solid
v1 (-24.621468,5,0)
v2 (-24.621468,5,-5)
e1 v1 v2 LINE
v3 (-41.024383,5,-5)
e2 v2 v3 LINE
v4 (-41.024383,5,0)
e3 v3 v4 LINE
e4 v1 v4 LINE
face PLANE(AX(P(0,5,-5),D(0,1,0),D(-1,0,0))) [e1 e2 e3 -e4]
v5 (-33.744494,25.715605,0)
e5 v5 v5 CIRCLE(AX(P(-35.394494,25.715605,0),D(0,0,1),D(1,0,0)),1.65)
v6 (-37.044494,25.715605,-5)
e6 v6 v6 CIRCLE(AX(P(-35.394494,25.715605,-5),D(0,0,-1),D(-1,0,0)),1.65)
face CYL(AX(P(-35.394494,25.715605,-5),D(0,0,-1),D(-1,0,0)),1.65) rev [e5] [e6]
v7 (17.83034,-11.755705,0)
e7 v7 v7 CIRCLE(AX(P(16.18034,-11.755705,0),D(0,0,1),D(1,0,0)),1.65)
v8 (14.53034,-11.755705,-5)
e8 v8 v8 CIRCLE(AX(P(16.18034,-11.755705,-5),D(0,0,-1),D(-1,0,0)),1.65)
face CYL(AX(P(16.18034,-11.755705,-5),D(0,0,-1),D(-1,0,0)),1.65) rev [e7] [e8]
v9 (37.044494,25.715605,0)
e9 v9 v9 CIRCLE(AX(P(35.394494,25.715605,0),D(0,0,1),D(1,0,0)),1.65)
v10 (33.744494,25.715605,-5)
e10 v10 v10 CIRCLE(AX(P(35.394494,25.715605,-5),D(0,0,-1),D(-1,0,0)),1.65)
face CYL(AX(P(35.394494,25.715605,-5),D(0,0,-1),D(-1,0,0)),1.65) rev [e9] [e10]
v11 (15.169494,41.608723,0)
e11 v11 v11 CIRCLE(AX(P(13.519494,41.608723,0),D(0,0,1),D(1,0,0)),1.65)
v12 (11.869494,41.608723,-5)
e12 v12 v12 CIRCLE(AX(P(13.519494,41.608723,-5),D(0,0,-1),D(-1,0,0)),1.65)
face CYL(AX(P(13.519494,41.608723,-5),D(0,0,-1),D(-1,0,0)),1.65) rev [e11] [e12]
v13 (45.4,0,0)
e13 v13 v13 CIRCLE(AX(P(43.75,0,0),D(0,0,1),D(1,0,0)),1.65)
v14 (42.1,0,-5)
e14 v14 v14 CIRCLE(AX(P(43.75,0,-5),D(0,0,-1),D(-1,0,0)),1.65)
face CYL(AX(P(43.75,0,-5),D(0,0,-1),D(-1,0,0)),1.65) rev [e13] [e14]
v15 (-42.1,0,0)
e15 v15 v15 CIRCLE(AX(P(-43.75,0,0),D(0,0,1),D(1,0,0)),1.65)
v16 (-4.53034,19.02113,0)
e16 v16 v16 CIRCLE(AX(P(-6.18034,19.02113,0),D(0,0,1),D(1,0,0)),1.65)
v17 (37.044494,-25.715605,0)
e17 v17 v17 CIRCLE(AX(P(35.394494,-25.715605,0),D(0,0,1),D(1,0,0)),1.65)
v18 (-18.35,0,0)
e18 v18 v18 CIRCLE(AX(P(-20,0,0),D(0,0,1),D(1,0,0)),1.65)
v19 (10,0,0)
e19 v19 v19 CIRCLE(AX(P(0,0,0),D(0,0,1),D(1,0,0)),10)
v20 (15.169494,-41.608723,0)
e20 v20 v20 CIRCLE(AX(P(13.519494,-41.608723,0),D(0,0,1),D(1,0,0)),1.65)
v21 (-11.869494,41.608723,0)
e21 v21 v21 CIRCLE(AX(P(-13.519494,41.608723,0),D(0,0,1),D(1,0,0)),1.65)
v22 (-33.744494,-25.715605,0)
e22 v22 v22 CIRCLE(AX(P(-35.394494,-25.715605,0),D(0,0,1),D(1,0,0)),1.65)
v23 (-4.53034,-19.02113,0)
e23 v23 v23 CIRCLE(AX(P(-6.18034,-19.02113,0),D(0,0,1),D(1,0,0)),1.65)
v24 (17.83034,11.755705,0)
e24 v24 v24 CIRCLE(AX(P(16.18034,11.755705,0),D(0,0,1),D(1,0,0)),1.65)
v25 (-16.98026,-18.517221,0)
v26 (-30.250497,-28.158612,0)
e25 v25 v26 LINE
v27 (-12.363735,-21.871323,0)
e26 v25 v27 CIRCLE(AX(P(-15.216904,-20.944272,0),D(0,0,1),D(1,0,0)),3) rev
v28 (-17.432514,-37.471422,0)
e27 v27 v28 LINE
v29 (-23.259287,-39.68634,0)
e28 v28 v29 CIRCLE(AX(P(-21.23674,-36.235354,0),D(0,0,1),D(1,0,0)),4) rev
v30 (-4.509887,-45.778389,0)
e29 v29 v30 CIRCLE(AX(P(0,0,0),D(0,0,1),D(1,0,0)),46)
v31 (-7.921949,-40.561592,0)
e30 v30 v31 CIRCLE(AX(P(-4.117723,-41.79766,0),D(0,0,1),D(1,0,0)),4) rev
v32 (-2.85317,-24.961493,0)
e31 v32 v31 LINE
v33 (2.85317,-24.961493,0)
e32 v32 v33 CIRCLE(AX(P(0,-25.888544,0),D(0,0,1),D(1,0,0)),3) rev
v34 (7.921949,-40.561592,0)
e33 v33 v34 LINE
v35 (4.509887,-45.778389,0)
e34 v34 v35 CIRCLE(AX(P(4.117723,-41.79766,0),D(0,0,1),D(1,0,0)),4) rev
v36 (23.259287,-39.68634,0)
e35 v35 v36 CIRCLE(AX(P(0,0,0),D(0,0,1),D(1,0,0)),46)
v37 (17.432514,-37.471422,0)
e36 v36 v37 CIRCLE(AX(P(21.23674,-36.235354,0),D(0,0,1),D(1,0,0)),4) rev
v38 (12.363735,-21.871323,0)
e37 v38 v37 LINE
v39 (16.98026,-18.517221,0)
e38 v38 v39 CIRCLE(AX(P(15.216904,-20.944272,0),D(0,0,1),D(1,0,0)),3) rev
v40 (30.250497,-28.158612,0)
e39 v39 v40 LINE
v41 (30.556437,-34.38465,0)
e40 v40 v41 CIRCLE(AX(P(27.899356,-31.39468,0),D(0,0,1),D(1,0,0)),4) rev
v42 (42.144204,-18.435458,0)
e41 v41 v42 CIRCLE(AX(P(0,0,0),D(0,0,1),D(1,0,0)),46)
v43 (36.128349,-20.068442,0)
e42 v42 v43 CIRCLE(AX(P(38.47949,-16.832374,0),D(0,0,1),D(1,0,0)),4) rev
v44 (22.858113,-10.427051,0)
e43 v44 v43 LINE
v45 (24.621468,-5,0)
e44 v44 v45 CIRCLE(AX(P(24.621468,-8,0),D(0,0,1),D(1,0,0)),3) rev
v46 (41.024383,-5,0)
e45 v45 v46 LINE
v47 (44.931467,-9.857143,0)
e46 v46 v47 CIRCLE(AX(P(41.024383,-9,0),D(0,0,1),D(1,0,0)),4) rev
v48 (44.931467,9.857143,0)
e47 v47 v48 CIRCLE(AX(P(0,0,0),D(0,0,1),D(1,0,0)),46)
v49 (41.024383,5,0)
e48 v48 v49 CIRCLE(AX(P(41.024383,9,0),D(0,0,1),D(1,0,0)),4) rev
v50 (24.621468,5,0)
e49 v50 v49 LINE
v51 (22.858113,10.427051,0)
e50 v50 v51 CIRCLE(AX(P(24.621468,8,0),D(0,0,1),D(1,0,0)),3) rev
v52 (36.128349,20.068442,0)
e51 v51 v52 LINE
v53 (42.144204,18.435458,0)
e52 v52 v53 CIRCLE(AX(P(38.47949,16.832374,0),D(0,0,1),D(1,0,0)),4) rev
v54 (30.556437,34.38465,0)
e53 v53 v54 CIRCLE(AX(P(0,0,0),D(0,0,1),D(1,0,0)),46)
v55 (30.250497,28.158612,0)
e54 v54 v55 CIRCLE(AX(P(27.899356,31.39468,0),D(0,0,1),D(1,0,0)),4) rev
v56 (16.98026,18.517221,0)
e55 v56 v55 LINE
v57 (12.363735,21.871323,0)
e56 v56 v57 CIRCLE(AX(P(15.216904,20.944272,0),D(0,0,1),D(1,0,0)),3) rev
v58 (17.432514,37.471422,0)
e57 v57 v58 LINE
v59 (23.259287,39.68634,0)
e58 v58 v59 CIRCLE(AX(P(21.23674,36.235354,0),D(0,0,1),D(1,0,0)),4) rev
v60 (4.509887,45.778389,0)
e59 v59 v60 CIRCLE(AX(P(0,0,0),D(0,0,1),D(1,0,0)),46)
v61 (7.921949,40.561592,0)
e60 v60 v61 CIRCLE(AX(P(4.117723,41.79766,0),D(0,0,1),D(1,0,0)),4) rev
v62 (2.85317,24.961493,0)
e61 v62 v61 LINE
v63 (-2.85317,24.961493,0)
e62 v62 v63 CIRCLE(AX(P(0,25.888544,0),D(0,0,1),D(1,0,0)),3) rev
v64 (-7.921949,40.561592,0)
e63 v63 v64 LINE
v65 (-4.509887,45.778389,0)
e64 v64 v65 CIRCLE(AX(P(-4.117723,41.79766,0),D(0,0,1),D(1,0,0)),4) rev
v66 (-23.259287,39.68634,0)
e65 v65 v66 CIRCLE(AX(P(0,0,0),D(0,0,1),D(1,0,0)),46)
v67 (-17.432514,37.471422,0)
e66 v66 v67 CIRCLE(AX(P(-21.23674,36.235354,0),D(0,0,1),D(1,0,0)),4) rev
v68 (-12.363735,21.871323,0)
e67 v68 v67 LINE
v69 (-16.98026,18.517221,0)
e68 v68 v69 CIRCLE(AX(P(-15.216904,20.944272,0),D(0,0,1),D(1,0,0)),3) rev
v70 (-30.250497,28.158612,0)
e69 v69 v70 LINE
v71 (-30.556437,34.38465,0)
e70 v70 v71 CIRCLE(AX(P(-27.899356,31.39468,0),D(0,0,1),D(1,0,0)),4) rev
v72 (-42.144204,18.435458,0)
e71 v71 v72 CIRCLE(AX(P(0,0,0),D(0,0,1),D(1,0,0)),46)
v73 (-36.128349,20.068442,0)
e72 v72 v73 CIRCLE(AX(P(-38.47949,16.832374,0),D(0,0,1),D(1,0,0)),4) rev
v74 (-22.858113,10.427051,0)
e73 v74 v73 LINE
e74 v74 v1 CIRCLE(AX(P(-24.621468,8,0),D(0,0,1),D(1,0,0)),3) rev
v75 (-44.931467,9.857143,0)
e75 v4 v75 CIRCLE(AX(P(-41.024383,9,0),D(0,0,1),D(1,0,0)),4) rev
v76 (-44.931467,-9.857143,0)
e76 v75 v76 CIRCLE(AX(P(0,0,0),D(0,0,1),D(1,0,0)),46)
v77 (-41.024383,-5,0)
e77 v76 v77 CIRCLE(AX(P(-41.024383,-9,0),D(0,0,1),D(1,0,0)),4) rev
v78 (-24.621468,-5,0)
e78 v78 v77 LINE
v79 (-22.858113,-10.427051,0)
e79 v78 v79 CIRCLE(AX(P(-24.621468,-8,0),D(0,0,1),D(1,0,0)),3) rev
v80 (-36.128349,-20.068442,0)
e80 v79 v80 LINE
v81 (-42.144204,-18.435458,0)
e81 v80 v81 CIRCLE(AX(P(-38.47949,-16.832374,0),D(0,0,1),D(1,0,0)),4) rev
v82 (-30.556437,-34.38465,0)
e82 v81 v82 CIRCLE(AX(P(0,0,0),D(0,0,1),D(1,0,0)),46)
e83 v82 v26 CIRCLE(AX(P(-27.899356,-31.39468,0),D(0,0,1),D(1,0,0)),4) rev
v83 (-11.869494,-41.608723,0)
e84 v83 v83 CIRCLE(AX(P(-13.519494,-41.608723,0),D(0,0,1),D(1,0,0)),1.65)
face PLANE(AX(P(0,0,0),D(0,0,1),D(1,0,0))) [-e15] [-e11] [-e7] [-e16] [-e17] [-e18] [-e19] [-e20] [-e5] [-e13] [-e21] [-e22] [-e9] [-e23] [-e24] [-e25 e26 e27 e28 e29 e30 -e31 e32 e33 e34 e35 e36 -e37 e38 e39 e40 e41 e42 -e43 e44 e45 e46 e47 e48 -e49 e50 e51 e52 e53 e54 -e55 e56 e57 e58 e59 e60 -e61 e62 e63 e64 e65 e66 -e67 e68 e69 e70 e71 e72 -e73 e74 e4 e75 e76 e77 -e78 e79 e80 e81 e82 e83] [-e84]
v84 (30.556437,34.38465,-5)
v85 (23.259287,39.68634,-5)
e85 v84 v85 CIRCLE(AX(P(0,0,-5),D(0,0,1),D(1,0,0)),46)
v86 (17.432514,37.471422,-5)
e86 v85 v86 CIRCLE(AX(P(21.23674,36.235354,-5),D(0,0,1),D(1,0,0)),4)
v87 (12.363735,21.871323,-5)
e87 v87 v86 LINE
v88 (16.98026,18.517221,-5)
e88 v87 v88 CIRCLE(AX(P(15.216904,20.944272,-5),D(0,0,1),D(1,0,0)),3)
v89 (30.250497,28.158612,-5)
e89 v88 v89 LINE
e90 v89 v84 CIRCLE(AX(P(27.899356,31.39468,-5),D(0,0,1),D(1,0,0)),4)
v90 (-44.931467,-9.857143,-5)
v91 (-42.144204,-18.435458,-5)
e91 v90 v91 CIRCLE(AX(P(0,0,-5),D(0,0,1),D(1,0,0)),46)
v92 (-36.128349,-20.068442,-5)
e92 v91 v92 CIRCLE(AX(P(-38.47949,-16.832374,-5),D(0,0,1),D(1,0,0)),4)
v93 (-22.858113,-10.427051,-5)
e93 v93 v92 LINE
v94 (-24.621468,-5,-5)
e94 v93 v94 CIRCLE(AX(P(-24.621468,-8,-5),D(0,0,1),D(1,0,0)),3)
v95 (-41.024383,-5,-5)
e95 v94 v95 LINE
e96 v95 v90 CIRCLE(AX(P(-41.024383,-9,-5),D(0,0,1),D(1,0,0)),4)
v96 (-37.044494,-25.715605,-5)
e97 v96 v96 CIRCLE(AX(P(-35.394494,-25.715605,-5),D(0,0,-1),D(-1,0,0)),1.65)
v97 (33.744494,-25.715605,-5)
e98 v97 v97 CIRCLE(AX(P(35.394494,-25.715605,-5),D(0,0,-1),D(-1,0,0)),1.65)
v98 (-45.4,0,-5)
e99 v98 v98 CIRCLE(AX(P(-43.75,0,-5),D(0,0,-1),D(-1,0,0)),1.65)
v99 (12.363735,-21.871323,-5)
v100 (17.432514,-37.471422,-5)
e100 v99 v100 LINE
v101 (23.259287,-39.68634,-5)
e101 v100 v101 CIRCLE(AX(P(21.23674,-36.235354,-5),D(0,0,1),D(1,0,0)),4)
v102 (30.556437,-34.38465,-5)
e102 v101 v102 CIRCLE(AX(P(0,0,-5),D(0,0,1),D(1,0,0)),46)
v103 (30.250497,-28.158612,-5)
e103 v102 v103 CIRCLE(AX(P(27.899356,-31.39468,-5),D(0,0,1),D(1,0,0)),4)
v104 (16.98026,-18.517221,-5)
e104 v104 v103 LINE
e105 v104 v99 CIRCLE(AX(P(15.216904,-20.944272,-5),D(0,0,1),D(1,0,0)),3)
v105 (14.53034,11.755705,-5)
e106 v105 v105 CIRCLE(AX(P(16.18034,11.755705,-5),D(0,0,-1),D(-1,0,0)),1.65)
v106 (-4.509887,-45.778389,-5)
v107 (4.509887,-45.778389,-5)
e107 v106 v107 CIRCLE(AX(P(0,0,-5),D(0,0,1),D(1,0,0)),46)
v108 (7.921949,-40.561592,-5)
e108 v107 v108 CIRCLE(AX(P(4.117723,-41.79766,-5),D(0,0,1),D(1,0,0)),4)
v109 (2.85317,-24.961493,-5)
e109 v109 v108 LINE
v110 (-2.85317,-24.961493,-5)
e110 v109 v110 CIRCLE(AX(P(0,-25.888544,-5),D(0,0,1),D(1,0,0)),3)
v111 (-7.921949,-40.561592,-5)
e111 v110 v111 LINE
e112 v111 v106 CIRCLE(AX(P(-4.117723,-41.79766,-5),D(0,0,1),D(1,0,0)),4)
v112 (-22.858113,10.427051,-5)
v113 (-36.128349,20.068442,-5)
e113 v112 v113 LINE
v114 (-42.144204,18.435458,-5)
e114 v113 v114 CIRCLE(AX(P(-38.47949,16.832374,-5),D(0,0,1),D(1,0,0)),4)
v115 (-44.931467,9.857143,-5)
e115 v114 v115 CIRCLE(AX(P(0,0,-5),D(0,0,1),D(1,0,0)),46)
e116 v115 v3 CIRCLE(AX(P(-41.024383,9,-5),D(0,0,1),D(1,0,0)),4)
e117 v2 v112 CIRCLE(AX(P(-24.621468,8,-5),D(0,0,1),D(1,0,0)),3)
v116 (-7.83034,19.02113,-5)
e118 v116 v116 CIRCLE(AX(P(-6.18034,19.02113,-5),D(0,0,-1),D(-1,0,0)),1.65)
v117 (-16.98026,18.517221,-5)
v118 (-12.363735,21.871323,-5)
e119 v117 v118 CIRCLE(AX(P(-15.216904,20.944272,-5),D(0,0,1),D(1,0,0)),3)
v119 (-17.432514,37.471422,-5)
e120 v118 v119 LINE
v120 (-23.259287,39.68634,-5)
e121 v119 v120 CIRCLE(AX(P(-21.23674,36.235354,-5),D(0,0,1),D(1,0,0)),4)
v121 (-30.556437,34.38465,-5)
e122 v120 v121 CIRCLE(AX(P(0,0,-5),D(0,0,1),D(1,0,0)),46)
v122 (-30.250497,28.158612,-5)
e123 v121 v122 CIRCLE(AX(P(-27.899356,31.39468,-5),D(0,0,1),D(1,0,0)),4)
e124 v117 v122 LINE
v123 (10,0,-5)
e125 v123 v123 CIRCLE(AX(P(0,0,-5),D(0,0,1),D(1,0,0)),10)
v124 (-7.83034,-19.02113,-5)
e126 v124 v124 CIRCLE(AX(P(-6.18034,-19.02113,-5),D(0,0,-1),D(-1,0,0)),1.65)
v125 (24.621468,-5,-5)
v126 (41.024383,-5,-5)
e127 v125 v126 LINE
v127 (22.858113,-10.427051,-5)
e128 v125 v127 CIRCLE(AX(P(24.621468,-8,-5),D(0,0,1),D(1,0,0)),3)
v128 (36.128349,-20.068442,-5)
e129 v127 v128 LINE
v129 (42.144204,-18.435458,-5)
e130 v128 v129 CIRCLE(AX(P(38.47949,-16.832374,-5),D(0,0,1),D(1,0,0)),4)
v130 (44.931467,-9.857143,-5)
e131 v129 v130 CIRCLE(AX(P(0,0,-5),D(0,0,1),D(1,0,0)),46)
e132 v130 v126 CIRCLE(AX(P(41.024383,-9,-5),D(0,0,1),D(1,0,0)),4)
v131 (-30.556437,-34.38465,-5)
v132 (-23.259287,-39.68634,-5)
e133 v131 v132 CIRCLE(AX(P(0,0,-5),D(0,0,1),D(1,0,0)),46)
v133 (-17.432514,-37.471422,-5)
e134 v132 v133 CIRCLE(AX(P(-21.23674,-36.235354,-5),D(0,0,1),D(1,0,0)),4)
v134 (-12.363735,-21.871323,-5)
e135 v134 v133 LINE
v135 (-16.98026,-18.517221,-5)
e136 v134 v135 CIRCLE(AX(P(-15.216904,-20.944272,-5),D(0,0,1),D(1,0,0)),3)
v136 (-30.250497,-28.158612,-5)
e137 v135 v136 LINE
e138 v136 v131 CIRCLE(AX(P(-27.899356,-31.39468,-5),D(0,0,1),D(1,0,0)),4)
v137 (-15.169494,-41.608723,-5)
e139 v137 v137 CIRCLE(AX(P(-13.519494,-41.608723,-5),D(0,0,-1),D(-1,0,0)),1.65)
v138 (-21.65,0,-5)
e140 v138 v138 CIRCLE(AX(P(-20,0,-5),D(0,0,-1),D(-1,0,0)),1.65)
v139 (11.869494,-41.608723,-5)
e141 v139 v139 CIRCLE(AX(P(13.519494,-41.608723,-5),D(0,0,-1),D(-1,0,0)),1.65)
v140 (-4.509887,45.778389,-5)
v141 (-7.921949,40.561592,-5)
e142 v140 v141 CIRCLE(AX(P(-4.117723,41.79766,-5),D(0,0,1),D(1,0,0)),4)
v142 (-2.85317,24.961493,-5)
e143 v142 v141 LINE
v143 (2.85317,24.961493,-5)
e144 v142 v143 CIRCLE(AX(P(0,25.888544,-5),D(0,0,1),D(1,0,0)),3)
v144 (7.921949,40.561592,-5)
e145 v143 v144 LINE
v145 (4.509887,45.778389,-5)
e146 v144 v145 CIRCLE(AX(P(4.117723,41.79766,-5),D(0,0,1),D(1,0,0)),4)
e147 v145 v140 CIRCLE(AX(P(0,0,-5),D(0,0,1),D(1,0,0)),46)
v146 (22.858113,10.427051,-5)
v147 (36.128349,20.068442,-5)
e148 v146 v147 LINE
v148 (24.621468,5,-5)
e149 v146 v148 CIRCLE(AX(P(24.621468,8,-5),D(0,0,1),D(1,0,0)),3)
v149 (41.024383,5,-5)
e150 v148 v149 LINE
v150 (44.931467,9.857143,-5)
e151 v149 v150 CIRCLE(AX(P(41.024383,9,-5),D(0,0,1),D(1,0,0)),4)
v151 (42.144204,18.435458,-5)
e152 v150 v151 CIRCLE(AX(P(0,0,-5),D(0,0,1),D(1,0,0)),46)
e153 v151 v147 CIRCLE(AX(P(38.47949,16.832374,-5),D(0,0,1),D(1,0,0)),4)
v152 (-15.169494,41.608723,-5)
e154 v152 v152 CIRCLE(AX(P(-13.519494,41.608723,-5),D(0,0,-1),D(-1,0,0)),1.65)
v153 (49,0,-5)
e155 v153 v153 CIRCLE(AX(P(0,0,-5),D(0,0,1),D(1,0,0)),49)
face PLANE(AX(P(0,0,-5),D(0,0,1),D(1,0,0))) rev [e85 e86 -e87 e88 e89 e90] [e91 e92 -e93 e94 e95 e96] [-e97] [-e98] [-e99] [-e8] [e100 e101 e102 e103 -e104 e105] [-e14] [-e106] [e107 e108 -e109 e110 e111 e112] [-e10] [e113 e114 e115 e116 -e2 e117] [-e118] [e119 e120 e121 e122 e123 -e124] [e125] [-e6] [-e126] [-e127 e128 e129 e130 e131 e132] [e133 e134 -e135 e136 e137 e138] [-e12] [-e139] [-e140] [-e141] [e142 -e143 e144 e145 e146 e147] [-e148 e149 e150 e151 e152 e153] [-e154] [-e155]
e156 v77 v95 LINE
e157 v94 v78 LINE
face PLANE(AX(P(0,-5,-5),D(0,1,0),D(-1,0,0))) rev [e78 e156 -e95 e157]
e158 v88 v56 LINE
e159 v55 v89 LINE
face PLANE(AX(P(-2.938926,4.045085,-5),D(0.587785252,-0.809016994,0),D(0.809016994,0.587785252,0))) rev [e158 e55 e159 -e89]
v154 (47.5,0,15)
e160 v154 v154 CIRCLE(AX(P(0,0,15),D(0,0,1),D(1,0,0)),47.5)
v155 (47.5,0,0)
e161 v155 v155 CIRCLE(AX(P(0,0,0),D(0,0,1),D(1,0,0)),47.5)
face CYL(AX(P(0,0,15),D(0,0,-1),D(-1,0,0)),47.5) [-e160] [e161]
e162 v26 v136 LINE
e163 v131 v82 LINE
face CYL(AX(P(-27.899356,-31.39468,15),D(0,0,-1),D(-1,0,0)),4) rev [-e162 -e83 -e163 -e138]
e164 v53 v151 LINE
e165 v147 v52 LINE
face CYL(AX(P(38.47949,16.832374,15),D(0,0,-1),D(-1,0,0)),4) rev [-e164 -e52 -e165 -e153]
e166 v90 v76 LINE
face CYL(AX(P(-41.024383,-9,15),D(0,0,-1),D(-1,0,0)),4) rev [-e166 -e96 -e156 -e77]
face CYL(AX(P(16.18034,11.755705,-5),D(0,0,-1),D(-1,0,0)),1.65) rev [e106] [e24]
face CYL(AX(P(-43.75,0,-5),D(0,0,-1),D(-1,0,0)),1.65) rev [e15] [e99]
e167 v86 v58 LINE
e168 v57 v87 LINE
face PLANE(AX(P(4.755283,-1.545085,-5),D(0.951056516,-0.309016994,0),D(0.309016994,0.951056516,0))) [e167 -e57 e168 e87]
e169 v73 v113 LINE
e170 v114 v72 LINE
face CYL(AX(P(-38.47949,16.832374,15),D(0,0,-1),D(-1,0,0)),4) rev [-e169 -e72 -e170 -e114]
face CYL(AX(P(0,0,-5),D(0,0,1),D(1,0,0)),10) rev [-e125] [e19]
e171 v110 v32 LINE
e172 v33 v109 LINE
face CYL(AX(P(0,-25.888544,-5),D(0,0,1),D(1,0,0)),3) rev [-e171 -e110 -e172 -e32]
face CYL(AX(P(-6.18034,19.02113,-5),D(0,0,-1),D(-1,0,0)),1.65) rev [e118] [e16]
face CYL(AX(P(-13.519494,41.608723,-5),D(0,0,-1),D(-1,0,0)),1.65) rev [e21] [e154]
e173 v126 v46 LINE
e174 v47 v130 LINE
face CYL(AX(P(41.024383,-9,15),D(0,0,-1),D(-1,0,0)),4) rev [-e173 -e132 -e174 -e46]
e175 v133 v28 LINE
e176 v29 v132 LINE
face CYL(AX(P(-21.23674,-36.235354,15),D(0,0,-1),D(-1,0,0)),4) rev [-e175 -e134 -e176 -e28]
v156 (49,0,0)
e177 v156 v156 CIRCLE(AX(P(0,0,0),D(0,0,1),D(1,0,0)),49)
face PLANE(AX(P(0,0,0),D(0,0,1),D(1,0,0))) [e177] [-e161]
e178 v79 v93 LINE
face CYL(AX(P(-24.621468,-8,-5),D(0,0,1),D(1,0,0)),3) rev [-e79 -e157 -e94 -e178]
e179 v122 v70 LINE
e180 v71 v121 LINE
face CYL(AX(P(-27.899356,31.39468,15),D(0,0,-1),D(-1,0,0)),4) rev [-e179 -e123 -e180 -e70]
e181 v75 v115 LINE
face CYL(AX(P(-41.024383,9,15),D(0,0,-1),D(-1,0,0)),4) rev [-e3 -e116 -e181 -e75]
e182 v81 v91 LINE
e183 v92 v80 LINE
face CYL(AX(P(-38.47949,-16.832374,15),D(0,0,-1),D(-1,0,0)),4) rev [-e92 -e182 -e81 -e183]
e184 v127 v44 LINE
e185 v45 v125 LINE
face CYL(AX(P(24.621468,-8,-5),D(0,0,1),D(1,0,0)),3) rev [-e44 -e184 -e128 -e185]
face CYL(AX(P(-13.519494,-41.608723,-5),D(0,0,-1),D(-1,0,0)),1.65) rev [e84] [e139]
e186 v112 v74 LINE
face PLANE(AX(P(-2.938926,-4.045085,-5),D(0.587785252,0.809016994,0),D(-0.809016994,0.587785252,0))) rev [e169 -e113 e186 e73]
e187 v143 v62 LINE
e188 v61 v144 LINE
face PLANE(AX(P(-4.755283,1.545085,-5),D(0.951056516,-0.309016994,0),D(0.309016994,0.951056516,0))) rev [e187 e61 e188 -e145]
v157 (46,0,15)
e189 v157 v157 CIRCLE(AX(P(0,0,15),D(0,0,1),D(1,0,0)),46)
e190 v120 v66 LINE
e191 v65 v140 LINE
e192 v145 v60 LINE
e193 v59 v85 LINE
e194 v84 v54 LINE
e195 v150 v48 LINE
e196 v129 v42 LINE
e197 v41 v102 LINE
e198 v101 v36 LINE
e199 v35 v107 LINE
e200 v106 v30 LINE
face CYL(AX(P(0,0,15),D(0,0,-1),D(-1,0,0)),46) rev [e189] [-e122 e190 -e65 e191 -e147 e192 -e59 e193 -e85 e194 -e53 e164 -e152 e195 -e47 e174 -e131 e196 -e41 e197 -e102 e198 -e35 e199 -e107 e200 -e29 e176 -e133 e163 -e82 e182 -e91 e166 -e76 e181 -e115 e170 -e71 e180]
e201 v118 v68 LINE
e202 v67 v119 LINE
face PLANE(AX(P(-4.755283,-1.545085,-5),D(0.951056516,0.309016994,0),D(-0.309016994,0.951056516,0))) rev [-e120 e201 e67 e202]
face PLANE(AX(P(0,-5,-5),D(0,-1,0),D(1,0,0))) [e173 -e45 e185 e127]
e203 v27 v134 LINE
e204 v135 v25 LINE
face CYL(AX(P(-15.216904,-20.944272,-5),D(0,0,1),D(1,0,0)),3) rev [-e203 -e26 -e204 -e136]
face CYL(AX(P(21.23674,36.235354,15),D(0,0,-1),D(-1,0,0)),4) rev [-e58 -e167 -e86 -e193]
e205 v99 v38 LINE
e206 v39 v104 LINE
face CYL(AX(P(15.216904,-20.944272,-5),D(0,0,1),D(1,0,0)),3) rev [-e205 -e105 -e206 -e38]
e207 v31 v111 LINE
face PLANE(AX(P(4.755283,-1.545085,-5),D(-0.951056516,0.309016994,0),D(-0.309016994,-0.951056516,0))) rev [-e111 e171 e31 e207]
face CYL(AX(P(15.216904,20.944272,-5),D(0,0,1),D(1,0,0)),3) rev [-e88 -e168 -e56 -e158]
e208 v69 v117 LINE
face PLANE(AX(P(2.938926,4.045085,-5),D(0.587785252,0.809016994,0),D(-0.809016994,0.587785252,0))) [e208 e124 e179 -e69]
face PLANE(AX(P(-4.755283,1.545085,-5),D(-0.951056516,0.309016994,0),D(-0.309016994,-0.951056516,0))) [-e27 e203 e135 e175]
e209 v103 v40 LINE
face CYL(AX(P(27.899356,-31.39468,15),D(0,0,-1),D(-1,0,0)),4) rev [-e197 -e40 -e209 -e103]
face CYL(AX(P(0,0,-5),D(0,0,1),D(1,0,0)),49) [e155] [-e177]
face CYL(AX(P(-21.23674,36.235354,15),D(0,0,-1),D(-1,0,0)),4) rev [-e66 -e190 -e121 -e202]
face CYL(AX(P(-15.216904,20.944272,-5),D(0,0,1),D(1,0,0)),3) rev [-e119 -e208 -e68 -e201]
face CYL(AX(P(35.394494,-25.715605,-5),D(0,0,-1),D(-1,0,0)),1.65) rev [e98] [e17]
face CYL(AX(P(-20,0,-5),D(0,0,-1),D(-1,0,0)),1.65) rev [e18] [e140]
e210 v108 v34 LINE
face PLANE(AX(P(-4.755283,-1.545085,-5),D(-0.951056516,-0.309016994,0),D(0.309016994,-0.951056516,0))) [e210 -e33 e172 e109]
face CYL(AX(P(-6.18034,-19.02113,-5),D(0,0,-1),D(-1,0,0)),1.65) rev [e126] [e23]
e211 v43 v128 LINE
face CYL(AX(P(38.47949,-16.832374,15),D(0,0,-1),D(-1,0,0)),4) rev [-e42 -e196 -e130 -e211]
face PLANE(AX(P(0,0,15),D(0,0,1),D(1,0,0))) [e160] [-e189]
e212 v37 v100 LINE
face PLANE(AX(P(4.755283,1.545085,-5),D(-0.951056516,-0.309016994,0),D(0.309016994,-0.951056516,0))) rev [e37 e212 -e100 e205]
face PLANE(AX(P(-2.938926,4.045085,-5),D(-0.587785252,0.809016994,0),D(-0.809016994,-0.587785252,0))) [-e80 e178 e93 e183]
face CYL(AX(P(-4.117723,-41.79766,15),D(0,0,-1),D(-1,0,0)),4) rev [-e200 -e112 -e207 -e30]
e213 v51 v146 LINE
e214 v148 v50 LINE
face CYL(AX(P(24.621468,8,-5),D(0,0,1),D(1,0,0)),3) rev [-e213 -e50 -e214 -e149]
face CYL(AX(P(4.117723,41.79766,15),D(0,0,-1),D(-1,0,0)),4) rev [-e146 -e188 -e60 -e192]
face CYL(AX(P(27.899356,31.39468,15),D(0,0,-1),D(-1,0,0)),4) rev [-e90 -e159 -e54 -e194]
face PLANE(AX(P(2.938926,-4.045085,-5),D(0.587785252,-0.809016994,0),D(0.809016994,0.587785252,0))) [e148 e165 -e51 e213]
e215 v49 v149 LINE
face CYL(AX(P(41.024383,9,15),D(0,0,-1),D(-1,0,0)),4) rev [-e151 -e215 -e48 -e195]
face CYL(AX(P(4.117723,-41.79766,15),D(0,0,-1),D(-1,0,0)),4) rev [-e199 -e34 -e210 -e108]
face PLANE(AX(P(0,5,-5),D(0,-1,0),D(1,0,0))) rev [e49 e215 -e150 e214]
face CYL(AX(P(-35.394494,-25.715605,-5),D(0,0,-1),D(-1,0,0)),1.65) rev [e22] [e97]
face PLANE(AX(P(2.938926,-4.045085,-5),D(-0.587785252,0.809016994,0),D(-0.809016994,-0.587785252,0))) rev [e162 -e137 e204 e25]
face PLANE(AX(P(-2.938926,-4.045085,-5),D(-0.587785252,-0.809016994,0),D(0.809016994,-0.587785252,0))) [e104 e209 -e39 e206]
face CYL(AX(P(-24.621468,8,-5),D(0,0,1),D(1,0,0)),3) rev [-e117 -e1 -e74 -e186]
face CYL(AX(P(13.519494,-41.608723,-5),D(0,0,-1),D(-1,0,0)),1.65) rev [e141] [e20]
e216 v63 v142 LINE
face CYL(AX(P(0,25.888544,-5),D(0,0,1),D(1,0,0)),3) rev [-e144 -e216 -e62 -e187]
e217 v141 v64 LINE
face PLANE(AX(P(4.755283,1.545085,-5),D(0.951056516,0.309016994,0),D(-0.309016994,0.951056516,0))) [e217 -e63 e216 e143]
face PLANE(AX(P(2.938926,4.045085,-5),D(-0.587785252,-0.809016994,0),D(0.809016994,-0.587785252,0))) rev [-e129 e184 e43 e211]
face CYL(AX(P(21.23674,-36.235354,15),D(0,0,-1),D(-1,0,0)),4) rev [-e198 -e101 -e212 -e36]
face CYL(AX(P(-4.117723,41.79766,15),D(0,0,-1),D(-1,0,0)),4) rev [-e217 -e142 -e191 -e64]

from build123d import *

# Parameters (mm, degrees)
BOSS_EXTRUDE3_DEPTH   = 15
BOSS_EXTRUDE4_START   = -5
SKETCH1_6_R           = 10
BOSS_EXTRUDE4_DEPTH   = 5
FILLET1_R             = 4
FILLET2_R             = 3
M4X0_7_TAPPED_HOLE1_D = 3.3
CIRPATTERN1_COUNT     = 5
M4X0_7_TAPPED_HOLE2_D = 3.3
CIRPATTERN2_COUNT     = 10


with BuildPart() as part:
    # Sketch1 → Boss-Extrude3 (new body)
    with BuildSketch(Plane.XY):
        with BuildLine():
            ThreePointArc((-45.727453461, 5), (-43.74859975, 14.214781741), (-39.933213221, 22.832837797))
            Line((-39.933213221, 22.832837797), (-41.153741247, 23.719603315))
            ThreePointArc((-41.153741247, 23.719603315), (-45.175184524, 14.678307233), (-47.236109069, 5))
            Line((-47.236109069, 5), (-45.727453461, 5))
        make_face()
        with BuildLine():
            ThreePointArc((-39.933213221, 22.832837797), (-37.214781741, 27.038121605), (-34.055360698, 30.923007741))
            Line((-34.055360698, 30.923007741), (-35.275888724, 31.809773258))
            ThreePointArc((-35.275888724, 31.809773258), (-38.428307233, 27.919799484), (-41.153741247, 23.719603315))
            Line((-41.153741247, 23.719603315), (-39.933213221, 22.832837797))
        make_face()
        with BuildLine():
            ThreePointArc((-34.055360698, 30.923007741), (-27.038121605, 37.214781741), (-18.88584281, 41.944307616))
            Line((-18.88584281, 41.944307616), (-19.352043032, 43.379124363))
            ThreePointArc((-19.352043032, 43.379124363), (-27.919799484, 38.428307233), (-35.275888724, 31.809773258))
            Line((-35.275888724, 31.809773258), (-34.055360698, 30.923007741))
        make_face()
        with BuildLine():
            ThreePointArc((-45.727453461, -5), (-46, 0), (-45.727453461, 5))
            Line((-45.727453461, 5), (-47.236109069, 5))
            ThreePointArc((-47.236109069, 5), (-47.5, 0), (-47.236109069, -5))
            Line((-47.236109069, -5), (-45.727453461, -5))
        make_face()
        with BuildLine():
            ThreePointArc((-39.933213221, -22.832837797), (-43.74859975, -14.214781741), (-45.727453461, -5))
            Line((-45.727453461, -5), (-47.236109069, -5))
            ThreePointArc((-47.236109069, -5), (-45.175184524, -14.678307233), (-41.153741247, -23.719603315))
            Line((-41.153741247, -23.719603315), (-39.933213221, -22.832837797))
        make_face()
        with BuildLine():
            Line((-35.275888724, -31.809773258), (-34.055360698, -30.923007741))
            ThreePointArc((-34.055360698, -30.923007741), (-37.214781741, -27.038121605), (-39.933213221, -22.832837797))
            Line((-39.933213221, -22.832837797), (-41.153741247, -23.719603315))
            ThreePointArc((-41.153741247, -23.719603315), (-38.428307233, -27.919799484), (-35.275888724, -31.809773258))
        make_face()
        with BuildLine():
            ThreePointArc((-18.88584281, 41.944307616), (-14.214781741, 43.74859975), (-9.375277647, 45.034477559))
            Line((-9.375277647, 45.034477559), (-9.841477869, 46.469294307))
            ThreePointArc((-9.841477869, 46.469294307), (-14.678307233, 45.175184524), (-19.352043032, 43.379124363))
            Line((-19.352043032, 43.379124363), (-18.88584281, 41.944307616))
        make_face()
        with BuildLine():
            ThreePointArc((-9.375277647, 45.034477559), (0, 46), (9.375277647, 45.034477559))
            Line((9.375277647, 45.034477559), (9.841477869, 46.469294307))
            ThreePointArc((9.841477869, 46.469294307), (0, 47.5), (-9.841477869, 46.469294307))
            Line((-9.841477869, 46.469294307), (-9.375277647, 45.034477559))
        make_face()
        with BuildLine():
            ThreePointArc((9.375277647, 45.034477559), (14.214781741, 43.74859975), (18.88584281, 41.944307616))
            Line((18.88584281, 41.944307616), (19.352043032, 43.379124363))
            ThreePointArc((19.352043032, 43.379124363), (14.678307233, 45.175184524), (9.841477869, 46.469294307))
            Line((9.841477869, 46.469294307), (9.375277647, 45.034477559))
        make_face()
        with BuildLine():
            ThreePointArc((18.88584281, 41.944307616), (27.038121605, 37.214781741), (34.055360698, 30.923007741))
            Line((34.055360698, 30.923007741), (35.275888724, 31.809773258))
            ThreePointArc((35.275888724, 31.809773258), (27.919799484, 38.428307233), (19.352043032, 43.379124363))
            Line((19.352043032, 43.379124363), (18.88584281, 41.944307616))
        make_face()
        with BuildLine():
            ThreePointArc((34.055360698, 30.923007741), (37.214781741, 27.038121605), (39.933213221, 22.832837797))
            Line((39.933213221, 22.832837797), (41.153741247, 23.719603315))
            ThreePointArc((41.153741247, 23.719603315), (38.428307233, 27.919799484), (35.275888724, 31.809773258))
            Line((35.275888724, 31.809773258), (34.055360698, 30.923007741))
        make_face()
        with BuildLine():
            ThreePointArc((39.933213221, 22.832837797), (43.74859975, 14.214781741), (45.727453461, 5))
            Line((45.727453461, 5), (47.236109069, 5))
            ThreePointArc((47.236109069, 5), (45.175184524, 14.678307233), (41.153741247, 23.719603315))
            Line((41.153741247, 23.719603315), (39.933213221, 22.832837797))
        make_face()
        with BuildLine():
            Line((47.236109069, 5), (45.727453461, 5))
            ThreePointArc((45.727453461, 5), (45.931812827, 2.503711326), (46, 0))
            ThreePointArc((46, 0), (45.931812827, -2.503711326), (45.727453461, -5))
            Line((45.727453461, -5), (47.236109069, -5))
            ThreePointArc((47.236109069, -5), (47.433981389, -2.5034795), (47.5, 0))
            ThreePointArc((47.5, 0), (47.433981389, 2.5034795), (47.236109069, 5))
        make_face()
        with BuildLine():
            Line((47.236109069, -5), (45.727453461, -5))
            ThreePointArc((45.727453461, -5), (43.74859975, -14.214781741), (39.933213221, -22.832837797))
            Line((39.933213221, -22.832837797), (41.153741247, -23.719603315))
            ThreePointArc((41.153741247, -23.719603315), (45.175184524, -14.678307233), (47.236109069, -5))
        make_face()
        with BuildLine():
            Line((41.153741247, -23.719603315), (39.933213221, -22.832837797))
            ThreePointArc((39.933213221, -22.832837797), (37.214781741, -27.038121605), (34.055360698, -30.923007741))
            Line((34.055360698, -30.923007741), (35.275888724, -31.809773258))
            ThreePointArc((35.275888724, -31.809773258), (38.428307233, -27.919799484), (41.153741247, -23.719603315))
        make_face()
        with BuildLine():
            Line((35.275888724, -31.809773258), (34.055360698, -30.923007741))
            ThreePointArc((34.055360698, -30.923007741), (27.038121605, -37.214781741), (18.88584281, -41.944307616))
            Line((18.88584281, -41.944307616), (19.352043032, -43.379124363))
            ThreePointArc((19.352043032, -43.379124363), (27.919799484, -38.428307233), (35.275888724, -31.809773258))
        make_face()
        with BuildLine():
            Line((19.352043032, -43.379124363), (18.88584281, -41.944307616))
            ThreePointArc((18.88584281, -41.944307616), (14.214781741, -43.74859975), (9.375277647, -45.034477559))
            Line((9.375277647, -45.034477559), (9.841477869, -46.469294307))
            ThreePointArc((9.841477869, -46.469294307), (14.678307233, -45.175184524), (19.352043032, -43.379124363))
        make_face()
        with BuildLine():
            Line((9.841477869, -46.469294307), (9.375277647, -45.034477559))
            ThreePointArc((9.375277647, -45.034477559), (0, -46), (-9.375277647, -45.034477559))
            Line((-9.375277647, -45.034477559), (-9.841477869, -46.469294307))
            ThreePointArc((-9.841477869, -46.469294307), (0, -47.5), (9.841477869, -46.469294307))
        make_face()
        with BuildLine():
            Line((-9.841477869, -46.469294307), (-9.375277647, -45.034477559))
            ThreePointArc((-9.375277647, -45.034477559), (-14.214781741, -43.74859975), (-18.88584281, -41.944307616))
            Line((-18.88584281, -41.944307616), (-19.352043032, -43.379124363))
            ThreePointArc((-19.352043032, -43.379124363), (-14.678307233, -45.175184524), (-9.841477869, -46.469294307))
        make_face()
        with BuildLine():
            Line((-19.352043032, -43.379124363), (-18.88584281, -41.944307616))
            ThreePointArc((-18.88584281, -41.944307616), (-27.038121605, -37.214781741), (-34.055360698, -30.923007741))
            Line((-34.055360698, -30.923007741), (-35.275888724, -31.809773258))
            ThreePointArc((-35.275888724, -31.809773258), (-27.919799484, -38.428307233), (-19.352043032, -43.379124363))
        make_face()
    extrude(amount=BOSS_EXTRUDE3_DEPTH)

    # Sketch1<6> → Boss-Extrude4 (add)
    # profile 1 of 41: a face of its own
    with BuildSketch(Plane.XY.offset(BOSS_EXTRUDE4_START)):
        with BuildLine():
            ThreePointArc((-19.352043032, 43.379124363), (-14.678307233, 45.175184524), (-9.841477869, 46.469294307))
            Line((-9.841477869, 46.469294307), (-10.307512998, 47.903602952))
            ThreePointArc((-10.307512998, 47.903602952), (-15.141832724, 46.601769298), (-19.818078161, 44.813433008))
            Line((-19.818078161, 44.813433008), (-19.352043032, 43.379124363))
        make_face()
    # profile 2 of 41: a face of its own
    with BuildSketch(Plane.XY.offset(BOSS_EXTRUDE4_START)):
        with BuildLine():
            ThreePointArc((-9.841477869, 46.469294307), (0, 47.5), (9.841477869, 46.469294307))
            Line((9.841477869, 46.469294307), (10.307512998, 47.903602952))
            ThreePointArc((10.307512998, 47.903602952), (0, 49), (-10.307512998, 47.903602952))
            Line((-10.307512998, 47.903602952), (-9.841477869, 46.469294307))
        make_face()
    # profile 3 of 41: a face of its own
    with BuildSketch(Plane.XY.offset(BOSS_EXTRUDE4_START)):
        with BuildLine():
            ThreePointArc((9.841477869, 46.469294307), (14.678307233, 45.175184524), (19.352043032, 43.379124363))
            Line((19.352043032, 43.379124363), (19.818078161, 44.813433008))
            ThreePointArc((19.818078161, 44.813433008), (15.141832724, 46.601769298), (10.307512998, 47.903602952))
            Line((10.307512998, 47.903602952), (9.841477869, 46.469294307))
        make_face()
    # profile 4 of 41: a face of its own
    with BuildSketch(Plane.XY.offset(BOSS_EXTRUDE4_START)):
        with BuildLine():
            ThreePointArc((19.352043032, 43.379124363), (27.919799484, 38.428307233), (35.275888724, 31.809773258))
            Line((35.275888724, 31.809773258), (36.495984532, 32.696224752))
            ThreePointArc((36.495984532, 32.696224752), (28.801477362, 39.641832724), (19.818078161, 44.813433008))
            Line((19.818078161, 44.813433008), (19.352043032, 43.379124363))
        make_face()
    # profile 5 of 41: a face of its own
    with BuildSketch(Plane.XY.offset(BOSS_EXTRUDE4_START)):
        with BuildLine():
            ThreePointArc((35.275888724, 31.809773258), (38.428307233, 27.919799484), (41.153741247, 23.719603315))
            Line((41.153741247, 23.719603315), (42.373837055, 24.606054808))
            ThreePointArc((42.373837055, 24.606054808), (39.641832724, 28.801477362), (36.495984532, 32.696224752))
            Line((36.495984532, 32.696224752), (35.275888724, 31.809773258))
        make_face()
    # profile 6 of 41: a face of its own
    with BuildSketch(Plane.XY.offset(BOSS_EXTRUDE4_START)):
        with BuildLine():
            ThreePointArc((41.153741247, 23.719603315), (45.175184524, 14.678307233), (47.236109069, 5))
            Line((47.236109069, 5), (48.744230428, 5))
            ThreePointArc((48.744230428, 5), (46.601769298, 15.141832724), (42.373837055, 24.606054808))
            Line((42.373837055, 24.606054808), (41.153741247, 23.719603315))
        make_face()
    # profile 7 of 41: a face of its own
    with BuildSketch(Plane.XY.offset(BOSS_EXTRUDE4_START)):
        with BuildLine():
            Line((48.744230428, 5), (47.236109069, 5))
            ThreePointArc((47.236109069, 5), (47.433981389, 2.5034795), (47.5, 0))
            ThreePointArc((47.5, 0), (47.433981389, -2.5034795), (47.236109069, -5))
            Line((47.236109069, -5), (48.744230428, -5))
            ThreePointArc((48.744230428, -5), (48.936015832, -2.503268767), (49, 0))
            ThreePointArc((49, 0), (48.936015832, 2.503268767), (48.744230428, 5))
        make_face()
    # profile 8 of 41: a face of its own
    with BuildSketch(Plane.XY.offset(BOSS_EXTRUDE4_START)):
        with BuildLine():
            Line((48.744230428, -5), (47.236109069, -5))
            ThreePointArc((47.236109069, -5), (45.175184524, -14.678307233), (41.153741247, -23.719603315))
            Line((41.153741247, -23.719603315), (42.373837055, -24.606054808))
            ThreePointArc((42.373837055, -24.606054808), (46.601769298, -15.141832724), (48.744230428, -5))
        make_face()
    # profile 9 of 41: a face of its own
    with BuildSketch(Plane.XY.offset(BOSS_EXTRUDE4_START)):
        with BuildLine():
            Line((42.373837055, -24.606054808), (41.153741247, -23.719603315))
            ThreePointArc((41.153741247, -23.719603315), (38.428307233, -27.919799484), (35.275888724, -31.809773258))
            Line((35.275888724, -31.809773258), (36.495984532, -32.696224752))
            ThreePointArc((36.495984532, -32.696224752), (39.641832724, -28.801477362), (42.373837055, -24.606054808))
        make_face()
    # profile 10 of 41: a face of its own
    with BuildSketch(Plane.XY.offset(BOSS_EXTRUDE4_START)):
        with BuildLine():
            Line((36.495984532, -32.696224752), (35.275888724, -31.809773258))
            ThreePointArc((35.275888724, -31.809773258), (27.919799484, -38.428307233), (19.352043032, -43.379124363))
            Line((19.352043032, -43.379124363), (19.818078161, -44.813433008))
            ThreePointArc((19.818078161, -44.813433008), (28.801477362, -39.641832724), (36.495984532, -32.696224752))
        make_face()
    # profile 11 of 41: a face of its own
    with BuildSketch(Plane.XY.offset(BOSS_EXTRUDE4_START)):
        with BuildLine():
            Line((19.818078161, -44.813433008), (19.352043032, -43.379124363))
            ThreePointArc((19.352043032, -43.379124363), (14.678307233, -45.175184524), (9.841477869, -46.469294307))
            Line((9.841477869, -46.469294307), (10.307512998, -47.903602952))
            ThreePointArc((10.307512998, -47.903602952), (15.141832724, -46.601769298), (19.818078161, -44.813433008))
        make_face()
    # profile 12 of 41: a face of its own
    with BuildSketch(Plane.XY.offset(BOSS_EXTRUDE4_START)):
        with BuildLine():
            Line((10.307512998, -47.903602952), (9.841477869, -46.469294307))
            ThreePointArc((9.841477869, -46.469294307), (0, -47.5), (-9.841477869, -46.469294307))
            Line((-9.841477869, -46.469294307), (-10.307512998, -47.903602952))
            ThreePointArc((-10.307512998, -47.903602952), (0, -49), (10.307512998, -47.903602952))
        make_face()
    # profile 13 of 41: a face of its own
    with BuildSketch(Plane.XY.offset(BOSS_EXTRUDE4_START)):
        with BuildLine():
            Line((-10.307512998, -47.903602952), (-9.841477869, -46.469294307))
            ThreePointArc((-9.841477869, -46.469294307), (-14.678307233, -45.175184524), (-19.352043032, -43.379124363))
            Line((-19.352043032, -43.379124363), (-19.818078161, -44.813433008))
            ThreePointArc((-19.818078161, -44.813433008), (-15.141832724, -46.601769298), (-10.307512998, -47.903602952))
        make_face()
    # profile 14 of 41: a face of its own
    with BuildSketch(Plane.XY.offset(BOSS_EXTRUDE4_START)):
        with BuildLine():
            Line((-19.818078161, -44.813433008), (-19.352043032, -43.379124363))
            ThreePointArc((-19.352043032, -43.379124363), (-27.919799484, -38.428307233), (-35.275888724, -31.809773258))
            Line((-35.275888724, -31.809773258), (-36.495984532, -32.696224752))
            ThreePointArc((-36.495984532, -32.696224752), (-28.801477362, -39.641832724), (-19.818078161, -44.813433008))
        make_face()
    # profile 15 of 41: a face of its own
    with BuildSketch(Plane.XY.offset(BOSS_EXTRUDE4_START)):
        with BuildLine():
            Line((-36.495984532, -32.696224752), (-35.275888724, -31.809773258))
            ThreePointArc((-35.275888724, -31.809773258), (-38.428307233, -27.919799484), (-41.153741247, -23.719603315))
            Line((-41.153741247, -23.719603315), (-42.373837055, -24.606054808))
            ThreePointArc((-42.373837055, -24.606054808), (-39.641832724, -28.801477362), (-36.495984532, -32.696224752))
        make_face()
    # profile 16 of 41: a face of its own
    with BuildSketch(Plane.XY.offset(BOSS_EXTRUDE4_START)):
        with BuildLine():
            ThreePointArc((-41.153741247, -23.719603315), (-45.175184524, -14.678307233), (-47.236109069, -5))
            Line((-47.236109069, -5), (-48.744230428, -5))
            ThreePointArc((-48.744230428, -5), (-46.601769298, -15.141832724), (-42.373837055, -24.606054808))
            Line((-42.373837055, -24.606054808), (-41.153741247, -23.719603315))
        make_face()
    # profile 17 of 41: a face of its own
    with BuildSketch(Plane.XY.offset(BOSS_EXTRUDE4_START)):
        with BuildLine():
            ThreePointArc((-47.236109069, -5), (-47.5, 0), (-47.236109069, 5))
            Line((-47.236109069, 5), (-48.744230428, 5))
            ThreePointArc((-48.744230428, 5), (-49, 0), (-48.744230428, -5))
            Line((-48.744230428, -5), (-47.236109069, -5))
        make_face()
    # profile 18 of 41: a face of its own
    with BuildSketch(Plane.XY.offset(BOSS_EXTRUDE4_START)):
        with BuildLine():
            ThreePointArc((-47.236109069, 5), (-45.175184524, 14.678307233), (-41.153741247, 23.719603315))
            Line((-41.153741247, 23.719603315), (-42.373837055, 24.606054808))
            ThreePointArc((-42.373837055, 24.606054808), (-46.601769298, 15.141832724), (-48.744230428, 5))
            Line((-48.744230428, 5), (-47.236109069, 5))
        make_face()
    # profile 19 of 41: a face of its own
    with BuildSketch(Plane.XY.offset(BOSS_EXTRUDE4_START)):
        with BuildLine():
            ThreePointArc((-41.153741247, 23.719603315), (-38.428307233, 27.919799484), (-35.275888724, 31.809773258))
            Line((-35.275888724, 31.809773258), (-36.495984532, 32.696224752))
            ThreePointArc((-36.495984532, 32.696224752), (-39.641832724, 28.801477362), (-42.373837055, 24.606054808))
            Line((-42.373837055, 24.606054808), (-41.153741247, 23.719603315))
        make_face()
    # profile 20 of 41: a face of its own
    with BuildSketch(Plane.XY.offset(BOSS_EXTRUDE4_START)):
        with BuildLine():
            ThreePointArc((-35.275888724, 31.809773258), (-27.919799484, 38.428307233), (-19.352043032, 43.379124363))
            Line((-19.352043032, 43.379124363), (-19.818078161, 44.813433008))
            ThreePointArc((-19.818078161, 44.813433008), (-28.801477362, 39.641832724), (-36.495984532, 32.696224752))
            Line((-36.495984532, 32.696224752), (-35.275888724, 31.809773258))
        make_face()
    # profile 21 of 41: a face of its own
    with BuildSketch(Plane.XY.offset(BOSS_EXTRUDE4_START)):
        with BuildLine():
            ThreePointArc((9.375277647, 45.034477559), (14.214781741, 43.74859975), (18.88584281, 41.944307616))
            Line((18.88584281, 41.944307616), (19.352043032, 43.379124363))
            ThreePointArc((19.352043032, 43.379124363), (14.678307233, 45.175184524), (9.841477869, 46.469294307))
            Line((9.841477869, 46.469294307), (9.375277647, 45.034477559))
        make_face()
    # profile 22 of 41: a face of its own
    with BuildSketch(Plane.XY.offset(BOSS_EXTRUDE4_START)):
        with BuildLine():
            ThreePointArc((18.88584281, 41.944307616), (27.038121605, 37.214781741), (34.055360698, 30.923007741))
            Line((34.055360698, 30.923007741), (35.275888724, 31.809773258))
            ThreePointArc((35.275888724, 31.809773258), (27.919799484, 38.428307233), (19.352043032, 43.379124363))
            Line((19.352043032, 43.379124363), (18.88584281, 41.944307616))
        make_face()
    # profile 23 of 41: a face of its own
    with BuildSketch(Plane.XY.offset(BOSS_EXTRUDE4_START)):
        with BuildLine():
            ThreePointArc((34.055360698, 30.923007741), (37.214781741, 27.038121605), (39.933213221, 22.832837797))
            Line((39.933213221, 22.832837797), (41.153741247, 23.719603315))
            ThreePointArc((41.153741247, 23.719603315), (38.428307233, 27.919799484), (35.275888724, 31.809773258))
            Line((35.275888724, 31.809773258), (34.055360698, 30.923007741))
        make_face()
    # profile 24 of 41: a face of its own
    with BuildSketch(Plane.XY.offset(BOSS_EXTRUDE4_START)):
        with BuildLine():
            ThreePointArc((39.933213221, 22.832837797), (43.74859975, 14.214781741), (45.727453461, 5))
            Line((45.727453461, 5), (47.236109069, 5))
            ThreePointArc((47.236109069, 5), (45.175184524, 14.678307233), (41.153741247, 23.719603315))
            Line((41.153741247, 23.719603315), (39.933213221, 22.832837797))
        make_face()
    # profile 25 of 41: a face of its own
    with BuildSketch(Plane.XY.offset(BOSS_EXTRUDE4_START)):
        with BuildLine():
            Line((47.236109069, 5), (45.727453461, 5))
            ThreePointArc((45.727453461, 5), (45.931812827, 2.503711326), (46, 0))
            ThreePointArc((46, 0), (45.931812827, -2.503711326), (45.727453461, -5))
            Line((45.727453461, -5), (47.236109069, -5))
            ThreePointArc((47.236109069, -5), (47.433981389, -2.5034795), (47.5, 0))
            ThreePointArc((47.5, 0), (47.433981389, 2.5034795), (47.236109069, 5))
        make_face()
    # profile 26 of 41: a face of its own
    with BuildSketch(Plane.XY.offset(BOSS_EXTRUDE4_START)):
        with BuildLine():
            Line((47.236109069, -5), (45.727453461, -5))
            ThreePointArc((45.727453461, -5), (43.74859975, -14.214781741), (39.933213221, -22.832837797))
            Line((39.933213221, -22.832837797), (41.153741247, -23.719603315))
            ThreePointArc((41.153741247, -23.719603315), (45.175184524, -14.678307233), (47.236109069, -5))
        make_face()
    # profile 27 of 41: a face of its own
    with BuildSketch(Plane.XY.offset(BOSS_EXTRUDE4_START)):
        with BuildLine():
            Line((41.153741247, -23.719603315), (39.933213221, -22.832837797))
            ThreePointArc((39.933213221, -22.832837797), (37.214781741, -27.038121605), (34.055360698, -30.923007741))
            Line((34.055360698, -30.923007741), (35.275888724, -31.809773258))
            ThreePointArc((35.275888724, -31.809773258), (38.428307233, -27.919799484), (41.153741247, -23.719603315))
        make_face()
    # profile 28 of 41: a face of its own
    with BuildSketch(Plane.XY.offset(BOSS_EXTRUDE4_START)):
        with BuildLine():
            Line((35.275888724, -31.809773258), (34.055360698, -30.923007741))
            ThreePointArc((34.055360698, -30.923007741), (27.038121605, -37.214781741), (18.88584281, -41.944307616))
            Line((18.88584281, -41.944307616), (19.352043032, -43.379124363))
            ThreePointArc((19.352043032, -43.379124363), (27.919799484, -38.428307233), (35.275888724, -31.809773258))
        make_face()
    # profile 29 of 41: a face of its own
    with BuildSketch(Plane.XY.offset(BOSS_EXTRUDE4_START)):
        with BuildLine():
            Line((19.352043032, -43.379124363), (18.88584281, -41.944307616))
            ThreePointArc((18.88584281, -41.944307616), (14.214781741, -43.74859975), (9.375277647, -45.034477559))
            Line((9.375277647, -45.034477559), (9.841477869, -46.469294307))
            ThreePointArc((9.841477869, -46.469294307), (14.678307233, -45.175184524), (19.352043032, -43.379124363))
        make_face()
    # profile 30 of 41: a face of its own
    with BuildSketch(Plane.XY.offset(BOSS_EXTRUDE4_START)):
        with BuildLine():
            Line((9.841477869, -46.469294307), (9.375277647, -45.034477559))
            ThreePointArc((9.375277647, -45.034477559), (0, -46), (-9.375277647, -45.034477559))
            Line((-9.375277647, -45.034477559), (-9.841477869, -46.469294307))
            ThreePointArc((-9.841477869, -46.469294307), (0, -47.5), (9.841477869, -46.469294307))
        make_face()
    # profile 31 of 41: a face of its own
    with BuildSketch(Plane.XY.offset(BOSS_EXTRUDE4_START)):
        with BuildLine():
            Line((-9.841477869, -46.469294307), (-9.375277647, -45.034477559))
            ThreePointArc((-9.375277647, -45.034477559), (-14.214781741, -43.74859975), (-18.88584281, -41.944307616))
            Line((-18.88584281, -41.944307616), (-19.352043032, -43.379124363))
            ThreePointArc((-19.352043032, -43.379124363), (-14.678307233, -45.175184524), (-9.841477869, -46.469294307))
        make_face()
    # profile 32 of 41: a face of its own
    with BuildSketch(Plane.XY.offset(BOSS_EXTRUDE4_START)):
        with BuildLine():
            Line((-19.352043032, -43.379124363), (-18.88584281, -41.944307616))
            ThreePointArc((-18.88584281, -41.944307616), (-27.038121605, -37.214781741), (-34.055360698, -30.923007741))
            Line((-34.055360698, -30.923007741), (-35.275888724, -31.809773258))
            ThreePointArc((-35.275888724, -31.809773258), (-27.919799484, -38.428307233), (-19.352043032, -43.379124363))
        make_face()
    # profile 33 of 41: a face of its own
    with BuildSketch(Plane.XY.offset(BOSS_EXTRUDE4_START)):
        with BuildLine():
            Line((-35.275888724, -31.809773258), (-34.055360698, -30.923007741))
            ThreePointArc((-34.055360698, -30.923007741), (-37.214781741, -27.038121605), (-39.933213221, -22.832837797))
            Line((-39.933213221, -22.832837797), (-41.153741247, -23.719603315))
            ThreePointArc((-41.153741247, -23.719603315), (-38.428307233, -27.919799484), (-35.275888724, -31.809773258))
        make_face()
    # profile 34 of 41: a face of its own
    with BuildSketch(Plane.XY.offset(BOSS_EXTRUDE4_START)):
        with BuildLine():
            ThreePointArc((-39.933213221, -22.832837797), (-43.74859975, -14.214781741), (-45.727453461, -5))
            Line((-45.727453461, -5), (-47.236109069, -5))
            ThreePointArc((-47.236109069, -5), (-45.175184524, -14.678307233), (-41.153741247, -23.719603315))
            Line((-41.153741247, -23.719603315), (-39.933213221, -22.832837797))
        make_face()
    # profile 35 of 41: a face of its own
    with BuildSketch(Plane.XY.offset(BOSS_EXTRUDE4_START)):
        with BuildLine():
            ThreePointArc((-45.727453461, -5), (-46, 0), (-45.727453461, 5))
            Line((-45.727453461, 5), (-47.236109069, 5))
            ThreePointArc((-47.236109069, 5), (-47.5, 0), (-47.236109069, -5))
            Line((-47.236109069, -5), (-45.727453461, -5))
        make_face()
    # profile 36 of 41: a face of its own
    with BuildSketch(Plane.XY.offset(BOSS_EXTRUDE4_START)):
        with BuildLine():
            ThreePointArc((-45.727453461, 5), (-43.74859975, 14.214781741), (-39.933213221, 22.832837797))
            Line((-39.933213221, 22.832837797), (-41.153741247, 23.719603315))
            ThreePointArc((-41.153741247, 23.719603315), (-45.175184524, 14.678307233), (-47.236109069, 5))
            Line((-47.236109069, 5), (-45.727453461, 5))
        make_face()
    # profile 37 of 41: a face of its own
    with BuildSketch(Plane.XY.offset(BOSS_EXTRUDE4_START)):
        with BuildLine():
            ThreePointArc((-39.933213221, 22.832837797), (-37.214781741, 27.038121605), (-34.055360698, 30.923007741))
            Line((-34.055360698, 30.923007741), (-35.275888724, 31.809773258))
            ThreePointArc((-35.275888724, 31.809773258), (-38.428307233, 27.919799484), (-41.153741247, 23.719603315))
            Line((-41.153741247, 23.719603315), (-39.933213221, 22.832837797))
        make_face()
    # profile 38 of 41: a face of its own
    with BuildSketch(Plane.XY.offset(BOSS_EXTRUDE4_START)):
        with BuildLine():
            ThreePointArc((-34.055360698, 30.923007741), (-27.038121605, 37.214781741), (-18.88584281, 41.944307616))
            Line((-18.88584281, 41.944307616), (-19.352043032, 43.379124363))
            ThreePointArc((-19.352043032, 43.379124363), (-27.919799484, 38.428307233), (-35.275888724, 31.809773258))
            Line((-35.275888724, 31.809773258), (-34.055360698, 30.923007741))
        make_face()
    # profile 39 of 41: a face of its own
    with BuildSketch(Plane.XY.offset(BOSS_EXTRUDE4_START)):
        with BuildLine():
            ThreePointArc((-18.88584281, 41.944307616), (-14.214781741, 43.74859975), (-9.375277647, 45.034477559))
            Line((-9.375277647, 45.034477559), (-9.841477869, 46.469294307))
            ThreePointArc((-9.841477869, 46.469294307), (-14.678307233, 45.175184524), (-19.352043032, 43.379124363))
            Line((-19.352043032, 43.379124363), (-18.88584281, 41.944307616))
        make_face()
    # profile 40 of 41: a face of its own
    with BuildSketch(Plane.XY.offset(BOSS_EXTRUDE4_START)):
        with BuildLine():
            ThreePointArc((-9.375277647, 45.034477559), (0, 46), (9.375277647, 45.034477559))
            Line((9.375277647, 45.034477559), (9.841477869, 46.469294307))
            ThreePointArc((9.841477869, 46.469294307), (0, 47.5), (-9.841477869, 46.469294307))
            Line((-9.841477869, 46.469294307), (-9.375277647, 45.034477559))
        make_face()
    # profile 41 of 41: a face of its own
    with BuildSketch(Plane.XY.offset(BOSS_EXTRUDE4_START)):
        with BuildLine():
            Line((45.727453461, 5), (15.388417686, 5))
            Line((15.388417686, 5), (39.933213221, 22.832837797))
            ThreePointArc((39.933213221, 22.832837797), (37.214781741, 27.038121605), (34.055360698, 30.923007741))
            Line((34.055360698, 30.923007741), (9.510565163, 13.090169944))
            Line((9.510565163, 13.090169944), (18.88584281, 41.944307616))
            ThreePointArc((18.88584281, 41.944307616), (14.214781741, 43.74859975), (9.375277647, 45.034477559))
            Line((9.375277647, 45.034477559), (0, 16.180339887))
            Line((0, 16.180339887), (-9.375277647, 45.034477559))
            ThreePointArc((-9.375277647, 45.034477559), (-14.214781741, 43.74859975), (-18.88584281, 41.944307616))
            Line((-18.88584281, 41.944307616), (-9.510565163, 13.090169944))
            Line((-9.510565163, 13.090169944), (-34.055360698, 30.923007741))
            ThreePointArc((-34.055360698, 30.923007741), (-37.214781741, 27.038121605), (-39.933213221, 22.832837797))
            Line((-39.933213221, 22.832837797), (-15.388417686, 5))
            Line((-15.388417686, 5), (-45.727453461, 5))
            ThreePointArc((-45.727453461, 5), (-46, 0), (-45.727453461, -5))
            Line((-45.727453461, -5), (-15.388417686, -5))
            Line((-15.388417686, -5), (-39.933213221, -22.832837797))
            ThreePointArc((-39.933213221, -22.832837797), (-37.214781741, -27.038121605), (-34.055360698, -30.923007741))
            Line((-34.055360698, -30.923007741), (-9.510565163, -13.090169944))
            Line((-9.510565163, -13.090169944), (-18.88584281, -41.944307616))
            ThreePointArc((-18.88584281, -41.944307616), (-14.214781741, -43.74859975), (-9.375277647, -45.034477559))
            Line((-9.375277647, -45.034477559), (0, -16.180339887))
            Line((0, -16.180339887), (9.375277647, -45.034477559))
            ThreePointArc((9.375277647, -45.034477559), (14.214781741, -43.74859975), (18.88584281, -41.944307616))
            Line((18.88584281, -41.944307616), (9.510565163, -13.090169944))
            Line((9.510565163, -13.090169944), (34.055360698, -30.923007741))
            ThreePointArc((34.055360698, -30.923007741), (37.214781741, -27.038121605), (39.933213221, -22.832837797))
            Line((39.933213221, -22.832837797), (15.388417686, -5))
            Line((15.388417686, -5), (45.727453461, -5))
            ThreePointArc((45.727453461, -5), (45.931812827, -2.503711326), (46, 0))
            ThreePointArc((46, 0), (45.931812827, 2.503711326), (45.727453461, 5))
        make_face()
        Circle(SKETCH1_6_R, mode=Mode.SUBTRACT)
    extrude(amount=BOSS_EXTRUDE4_DEPTH)

    # Fillet1
    # the kernel refuses this fillet: 4 mm, written as the material it adds along each edge
    with BuildSketch(Plane(origin=(-34.055360698, 30.923007741, -5), x_dir=(0.7108839082024422, 0.7033093693808024, 0), z_dir=(0, 0, 1)), Plane(origin=(-9.375277647, 45.034477559, -5), x_dir=(0.9885120378846195, 0.15114215479870854, 0), z_dir=(0, 0, 1)), Plane(origin=(45.727453461, -5, -5), x_dir=(-0.16172228764240998, -0.9868363094656103, 0), z_dir=(0, 0, 1)), Plane(origin=(34.055360698, -30.923007741, -5), x_dir=(-0.7108839082025105, -0.7033093693807332, 0), z_dir=(0, 0, 1)), Plane(origin=(9.375277647, -45.034477559, -5), x_dir=(-0.9885120378846224, -0.15114215479868973, 0), z_dir=(0, 0, 1)), Plane(origin=(-18.88584281, -41.944307616, -5), x_dir=(-0.8885621673832776, 0.4587562257835115, 0), z_dir=(0, 0, 1)), Plane(origin=(-39.933213221, -22.832837797, -5), x_dir=(-0.4492117500588274, 0.893425320667086, 0), z_dir=(0, 0, 1)), Plane(origin=(-45.727453461, 5, -5), x_dir=(0.16172228764235855, 0.9868363094656187, 0), z_dir=(0, 0, 1)), Plane(origin=(18.88584281, 41.944307616, -5), x_dir=(0.8885621673832427, -0.45875622578357905, 0), z_dir=(0, 0, 1)), Plane(origin=(39.933213221, 22.832837797, -5), x_dir=(0.4492117500587163, -0.893425320667142, 0), z_dir=(0, 0, 1))) as fillet1_piece_1:
        with BuildLine():
            CenterArc((4.707936553, -3.994271552), FILLET1_R, 86.933252991, 102.373625116)
            Line((0.760591315, -4.641160703), (0, 0))
            ThreePointArc((0, 0), (2.460966834, 0.065877147), (4.921933669, 0))
        make_face()
    extrude(amount=5)
    with BuildSketch(Plane(origin=(9.375277647, 45.034477559, -5), x_dir=(-0.9885120378846203, 0.1511421547987031, 0), z_dir=(0, 0, 1)), Plane(origin=(39.933213221, -22.832837797, -5), x_dir=(0.44921175005871306, 0.8934253206671435, 0), z_dir=(0, 0, 1)), Plane(origin=(34.055360698, 30.923007741, -5), x_dir=(-0.7108839082024975, 0.7033093693807462, 0), z_dir=(0, 0, 1)), Plane(origin=(-18.88584281, 41.944307616, -5), x_dir=(-0.8885621673832371, -0.45875622578358993, 0), z_dir=(0, 0, 1)), Plane(origin=(18.88584281, -41.944307616, -5), x_dir=(0.8885621673832121, 0.4587562257836381, 0), z_dir=(0, 0, 1)), Plane(origin=(-9.375277647, -45.034477559, -5), x_dir=(0.988512037884622, -0.15114215479869167, 0), z_dir=(0, 0, 1)), Plane(origin=(-34.055360698, -30.923007741, -5), x_dir=(0.7108839082025497, -0.7033093693806937, 0), z_dir=(0, 0, 1)), Plane(origin=(-45.727453461, -5, -5), x_dir=(0.16172228764234597, -0.9868363094656206, 0), z_dir=(0, 0, 1)), Plane(origin=(-39.933213221, 22.832837797, -5), x_dir=(-0.44921175005870206, -0.8934253206671492, 0), z_dir=(0, 0, 1)), Plane(origin=(45.727453461, 5, -5), x_dir=(-0.16172228764240423, 0.9868363094656112, 0), z_dir=(0, 0, 1))) as fillet1_piece_2:
        with BuildLine():
            CenterArc((4.707936553, 3.994271552), FILLET1_R, 170.693121893, 102.373625116)
            Line((0.760591315, 4.641160703), (0, 0))
            ThreePointArc((0, 0), (2.460966834, -0.065877147), (4.921933669, 0))
        make_face()
    extrude(amount=5)

    # Fillet2
    fillet2_edges = [part.edges().sort_by_distance(p)[0] for p in [
        (-9.510565163, 13.090169944, -2.5),
        (9.510565163, -13.090169944, -2.5),
        (0, -16.180339887, -2.5),
        (-9.510565163, -13.090169944, -2.5),
        (-15.388417686, -5, -2.5),
        (-15.388417686, 5, -2.5),
        (15.388417686, 5, -2.5),
        (0, 16.180339887, -2.5),
        (15.388417686, -5, -2.5),
        (9.510565163, 13.090169944, -2.5),
    ]]
    fillet(fillet2_edges, radius=FILLET2_R)

    # M4x0.7 Tapped Hole1 (through all)
    with Locations(Plane(origin=(0, 0, -5), x_dir=(-1, 0, 0), z_dir=(0, 0, -1))):
        with Locations((20, 0)):
            m4x0_7_tapped_hole1 = Hole(M4X0_7_TAPPED_HOLE1_D / 2)

    # CirPattern1: M4x0.7 Tapped Hole1 ×5 about axis
    cirpattern1_axis = Axis((0, 0, 0), (0, 0, 1))
    for i in range(1, CIRPATTERN1_COUNT):
        add(m4x0_7_tapped_hole1.rotate(cirpattern1_axis, i * 360 / CIRPATTERN1_COUNT), mode=Mode.SUBTRACT)

    # M4x0.7 Tapped Hole2 (through all)
    with Locations(Plane(origin=(0, 0, -5), x_dir=(-1, 0, 0), z_dir=(0, 0, -1))):
        with Locations((43.75, 0)):
            m4x0_7_tapped_hole2 = Hole(M4X0_7_TAPPED_HOLE2_D / 2)

    # CirPattern2: M4x0.7 Tapped Hole2 ×10 about axis
    cirpattern2_axis = Axis((0, 0, 0), (0, 0, 1))
    for i in range(1, CIRPATTERN2_COUNT):
        add(m4x0_7_tapped_hole2.rotate(cirpattern2_axis, i * 360 / CIRPATTERN2_COUNT), mode=Mode.SUBTRACT)


solid = part.part
